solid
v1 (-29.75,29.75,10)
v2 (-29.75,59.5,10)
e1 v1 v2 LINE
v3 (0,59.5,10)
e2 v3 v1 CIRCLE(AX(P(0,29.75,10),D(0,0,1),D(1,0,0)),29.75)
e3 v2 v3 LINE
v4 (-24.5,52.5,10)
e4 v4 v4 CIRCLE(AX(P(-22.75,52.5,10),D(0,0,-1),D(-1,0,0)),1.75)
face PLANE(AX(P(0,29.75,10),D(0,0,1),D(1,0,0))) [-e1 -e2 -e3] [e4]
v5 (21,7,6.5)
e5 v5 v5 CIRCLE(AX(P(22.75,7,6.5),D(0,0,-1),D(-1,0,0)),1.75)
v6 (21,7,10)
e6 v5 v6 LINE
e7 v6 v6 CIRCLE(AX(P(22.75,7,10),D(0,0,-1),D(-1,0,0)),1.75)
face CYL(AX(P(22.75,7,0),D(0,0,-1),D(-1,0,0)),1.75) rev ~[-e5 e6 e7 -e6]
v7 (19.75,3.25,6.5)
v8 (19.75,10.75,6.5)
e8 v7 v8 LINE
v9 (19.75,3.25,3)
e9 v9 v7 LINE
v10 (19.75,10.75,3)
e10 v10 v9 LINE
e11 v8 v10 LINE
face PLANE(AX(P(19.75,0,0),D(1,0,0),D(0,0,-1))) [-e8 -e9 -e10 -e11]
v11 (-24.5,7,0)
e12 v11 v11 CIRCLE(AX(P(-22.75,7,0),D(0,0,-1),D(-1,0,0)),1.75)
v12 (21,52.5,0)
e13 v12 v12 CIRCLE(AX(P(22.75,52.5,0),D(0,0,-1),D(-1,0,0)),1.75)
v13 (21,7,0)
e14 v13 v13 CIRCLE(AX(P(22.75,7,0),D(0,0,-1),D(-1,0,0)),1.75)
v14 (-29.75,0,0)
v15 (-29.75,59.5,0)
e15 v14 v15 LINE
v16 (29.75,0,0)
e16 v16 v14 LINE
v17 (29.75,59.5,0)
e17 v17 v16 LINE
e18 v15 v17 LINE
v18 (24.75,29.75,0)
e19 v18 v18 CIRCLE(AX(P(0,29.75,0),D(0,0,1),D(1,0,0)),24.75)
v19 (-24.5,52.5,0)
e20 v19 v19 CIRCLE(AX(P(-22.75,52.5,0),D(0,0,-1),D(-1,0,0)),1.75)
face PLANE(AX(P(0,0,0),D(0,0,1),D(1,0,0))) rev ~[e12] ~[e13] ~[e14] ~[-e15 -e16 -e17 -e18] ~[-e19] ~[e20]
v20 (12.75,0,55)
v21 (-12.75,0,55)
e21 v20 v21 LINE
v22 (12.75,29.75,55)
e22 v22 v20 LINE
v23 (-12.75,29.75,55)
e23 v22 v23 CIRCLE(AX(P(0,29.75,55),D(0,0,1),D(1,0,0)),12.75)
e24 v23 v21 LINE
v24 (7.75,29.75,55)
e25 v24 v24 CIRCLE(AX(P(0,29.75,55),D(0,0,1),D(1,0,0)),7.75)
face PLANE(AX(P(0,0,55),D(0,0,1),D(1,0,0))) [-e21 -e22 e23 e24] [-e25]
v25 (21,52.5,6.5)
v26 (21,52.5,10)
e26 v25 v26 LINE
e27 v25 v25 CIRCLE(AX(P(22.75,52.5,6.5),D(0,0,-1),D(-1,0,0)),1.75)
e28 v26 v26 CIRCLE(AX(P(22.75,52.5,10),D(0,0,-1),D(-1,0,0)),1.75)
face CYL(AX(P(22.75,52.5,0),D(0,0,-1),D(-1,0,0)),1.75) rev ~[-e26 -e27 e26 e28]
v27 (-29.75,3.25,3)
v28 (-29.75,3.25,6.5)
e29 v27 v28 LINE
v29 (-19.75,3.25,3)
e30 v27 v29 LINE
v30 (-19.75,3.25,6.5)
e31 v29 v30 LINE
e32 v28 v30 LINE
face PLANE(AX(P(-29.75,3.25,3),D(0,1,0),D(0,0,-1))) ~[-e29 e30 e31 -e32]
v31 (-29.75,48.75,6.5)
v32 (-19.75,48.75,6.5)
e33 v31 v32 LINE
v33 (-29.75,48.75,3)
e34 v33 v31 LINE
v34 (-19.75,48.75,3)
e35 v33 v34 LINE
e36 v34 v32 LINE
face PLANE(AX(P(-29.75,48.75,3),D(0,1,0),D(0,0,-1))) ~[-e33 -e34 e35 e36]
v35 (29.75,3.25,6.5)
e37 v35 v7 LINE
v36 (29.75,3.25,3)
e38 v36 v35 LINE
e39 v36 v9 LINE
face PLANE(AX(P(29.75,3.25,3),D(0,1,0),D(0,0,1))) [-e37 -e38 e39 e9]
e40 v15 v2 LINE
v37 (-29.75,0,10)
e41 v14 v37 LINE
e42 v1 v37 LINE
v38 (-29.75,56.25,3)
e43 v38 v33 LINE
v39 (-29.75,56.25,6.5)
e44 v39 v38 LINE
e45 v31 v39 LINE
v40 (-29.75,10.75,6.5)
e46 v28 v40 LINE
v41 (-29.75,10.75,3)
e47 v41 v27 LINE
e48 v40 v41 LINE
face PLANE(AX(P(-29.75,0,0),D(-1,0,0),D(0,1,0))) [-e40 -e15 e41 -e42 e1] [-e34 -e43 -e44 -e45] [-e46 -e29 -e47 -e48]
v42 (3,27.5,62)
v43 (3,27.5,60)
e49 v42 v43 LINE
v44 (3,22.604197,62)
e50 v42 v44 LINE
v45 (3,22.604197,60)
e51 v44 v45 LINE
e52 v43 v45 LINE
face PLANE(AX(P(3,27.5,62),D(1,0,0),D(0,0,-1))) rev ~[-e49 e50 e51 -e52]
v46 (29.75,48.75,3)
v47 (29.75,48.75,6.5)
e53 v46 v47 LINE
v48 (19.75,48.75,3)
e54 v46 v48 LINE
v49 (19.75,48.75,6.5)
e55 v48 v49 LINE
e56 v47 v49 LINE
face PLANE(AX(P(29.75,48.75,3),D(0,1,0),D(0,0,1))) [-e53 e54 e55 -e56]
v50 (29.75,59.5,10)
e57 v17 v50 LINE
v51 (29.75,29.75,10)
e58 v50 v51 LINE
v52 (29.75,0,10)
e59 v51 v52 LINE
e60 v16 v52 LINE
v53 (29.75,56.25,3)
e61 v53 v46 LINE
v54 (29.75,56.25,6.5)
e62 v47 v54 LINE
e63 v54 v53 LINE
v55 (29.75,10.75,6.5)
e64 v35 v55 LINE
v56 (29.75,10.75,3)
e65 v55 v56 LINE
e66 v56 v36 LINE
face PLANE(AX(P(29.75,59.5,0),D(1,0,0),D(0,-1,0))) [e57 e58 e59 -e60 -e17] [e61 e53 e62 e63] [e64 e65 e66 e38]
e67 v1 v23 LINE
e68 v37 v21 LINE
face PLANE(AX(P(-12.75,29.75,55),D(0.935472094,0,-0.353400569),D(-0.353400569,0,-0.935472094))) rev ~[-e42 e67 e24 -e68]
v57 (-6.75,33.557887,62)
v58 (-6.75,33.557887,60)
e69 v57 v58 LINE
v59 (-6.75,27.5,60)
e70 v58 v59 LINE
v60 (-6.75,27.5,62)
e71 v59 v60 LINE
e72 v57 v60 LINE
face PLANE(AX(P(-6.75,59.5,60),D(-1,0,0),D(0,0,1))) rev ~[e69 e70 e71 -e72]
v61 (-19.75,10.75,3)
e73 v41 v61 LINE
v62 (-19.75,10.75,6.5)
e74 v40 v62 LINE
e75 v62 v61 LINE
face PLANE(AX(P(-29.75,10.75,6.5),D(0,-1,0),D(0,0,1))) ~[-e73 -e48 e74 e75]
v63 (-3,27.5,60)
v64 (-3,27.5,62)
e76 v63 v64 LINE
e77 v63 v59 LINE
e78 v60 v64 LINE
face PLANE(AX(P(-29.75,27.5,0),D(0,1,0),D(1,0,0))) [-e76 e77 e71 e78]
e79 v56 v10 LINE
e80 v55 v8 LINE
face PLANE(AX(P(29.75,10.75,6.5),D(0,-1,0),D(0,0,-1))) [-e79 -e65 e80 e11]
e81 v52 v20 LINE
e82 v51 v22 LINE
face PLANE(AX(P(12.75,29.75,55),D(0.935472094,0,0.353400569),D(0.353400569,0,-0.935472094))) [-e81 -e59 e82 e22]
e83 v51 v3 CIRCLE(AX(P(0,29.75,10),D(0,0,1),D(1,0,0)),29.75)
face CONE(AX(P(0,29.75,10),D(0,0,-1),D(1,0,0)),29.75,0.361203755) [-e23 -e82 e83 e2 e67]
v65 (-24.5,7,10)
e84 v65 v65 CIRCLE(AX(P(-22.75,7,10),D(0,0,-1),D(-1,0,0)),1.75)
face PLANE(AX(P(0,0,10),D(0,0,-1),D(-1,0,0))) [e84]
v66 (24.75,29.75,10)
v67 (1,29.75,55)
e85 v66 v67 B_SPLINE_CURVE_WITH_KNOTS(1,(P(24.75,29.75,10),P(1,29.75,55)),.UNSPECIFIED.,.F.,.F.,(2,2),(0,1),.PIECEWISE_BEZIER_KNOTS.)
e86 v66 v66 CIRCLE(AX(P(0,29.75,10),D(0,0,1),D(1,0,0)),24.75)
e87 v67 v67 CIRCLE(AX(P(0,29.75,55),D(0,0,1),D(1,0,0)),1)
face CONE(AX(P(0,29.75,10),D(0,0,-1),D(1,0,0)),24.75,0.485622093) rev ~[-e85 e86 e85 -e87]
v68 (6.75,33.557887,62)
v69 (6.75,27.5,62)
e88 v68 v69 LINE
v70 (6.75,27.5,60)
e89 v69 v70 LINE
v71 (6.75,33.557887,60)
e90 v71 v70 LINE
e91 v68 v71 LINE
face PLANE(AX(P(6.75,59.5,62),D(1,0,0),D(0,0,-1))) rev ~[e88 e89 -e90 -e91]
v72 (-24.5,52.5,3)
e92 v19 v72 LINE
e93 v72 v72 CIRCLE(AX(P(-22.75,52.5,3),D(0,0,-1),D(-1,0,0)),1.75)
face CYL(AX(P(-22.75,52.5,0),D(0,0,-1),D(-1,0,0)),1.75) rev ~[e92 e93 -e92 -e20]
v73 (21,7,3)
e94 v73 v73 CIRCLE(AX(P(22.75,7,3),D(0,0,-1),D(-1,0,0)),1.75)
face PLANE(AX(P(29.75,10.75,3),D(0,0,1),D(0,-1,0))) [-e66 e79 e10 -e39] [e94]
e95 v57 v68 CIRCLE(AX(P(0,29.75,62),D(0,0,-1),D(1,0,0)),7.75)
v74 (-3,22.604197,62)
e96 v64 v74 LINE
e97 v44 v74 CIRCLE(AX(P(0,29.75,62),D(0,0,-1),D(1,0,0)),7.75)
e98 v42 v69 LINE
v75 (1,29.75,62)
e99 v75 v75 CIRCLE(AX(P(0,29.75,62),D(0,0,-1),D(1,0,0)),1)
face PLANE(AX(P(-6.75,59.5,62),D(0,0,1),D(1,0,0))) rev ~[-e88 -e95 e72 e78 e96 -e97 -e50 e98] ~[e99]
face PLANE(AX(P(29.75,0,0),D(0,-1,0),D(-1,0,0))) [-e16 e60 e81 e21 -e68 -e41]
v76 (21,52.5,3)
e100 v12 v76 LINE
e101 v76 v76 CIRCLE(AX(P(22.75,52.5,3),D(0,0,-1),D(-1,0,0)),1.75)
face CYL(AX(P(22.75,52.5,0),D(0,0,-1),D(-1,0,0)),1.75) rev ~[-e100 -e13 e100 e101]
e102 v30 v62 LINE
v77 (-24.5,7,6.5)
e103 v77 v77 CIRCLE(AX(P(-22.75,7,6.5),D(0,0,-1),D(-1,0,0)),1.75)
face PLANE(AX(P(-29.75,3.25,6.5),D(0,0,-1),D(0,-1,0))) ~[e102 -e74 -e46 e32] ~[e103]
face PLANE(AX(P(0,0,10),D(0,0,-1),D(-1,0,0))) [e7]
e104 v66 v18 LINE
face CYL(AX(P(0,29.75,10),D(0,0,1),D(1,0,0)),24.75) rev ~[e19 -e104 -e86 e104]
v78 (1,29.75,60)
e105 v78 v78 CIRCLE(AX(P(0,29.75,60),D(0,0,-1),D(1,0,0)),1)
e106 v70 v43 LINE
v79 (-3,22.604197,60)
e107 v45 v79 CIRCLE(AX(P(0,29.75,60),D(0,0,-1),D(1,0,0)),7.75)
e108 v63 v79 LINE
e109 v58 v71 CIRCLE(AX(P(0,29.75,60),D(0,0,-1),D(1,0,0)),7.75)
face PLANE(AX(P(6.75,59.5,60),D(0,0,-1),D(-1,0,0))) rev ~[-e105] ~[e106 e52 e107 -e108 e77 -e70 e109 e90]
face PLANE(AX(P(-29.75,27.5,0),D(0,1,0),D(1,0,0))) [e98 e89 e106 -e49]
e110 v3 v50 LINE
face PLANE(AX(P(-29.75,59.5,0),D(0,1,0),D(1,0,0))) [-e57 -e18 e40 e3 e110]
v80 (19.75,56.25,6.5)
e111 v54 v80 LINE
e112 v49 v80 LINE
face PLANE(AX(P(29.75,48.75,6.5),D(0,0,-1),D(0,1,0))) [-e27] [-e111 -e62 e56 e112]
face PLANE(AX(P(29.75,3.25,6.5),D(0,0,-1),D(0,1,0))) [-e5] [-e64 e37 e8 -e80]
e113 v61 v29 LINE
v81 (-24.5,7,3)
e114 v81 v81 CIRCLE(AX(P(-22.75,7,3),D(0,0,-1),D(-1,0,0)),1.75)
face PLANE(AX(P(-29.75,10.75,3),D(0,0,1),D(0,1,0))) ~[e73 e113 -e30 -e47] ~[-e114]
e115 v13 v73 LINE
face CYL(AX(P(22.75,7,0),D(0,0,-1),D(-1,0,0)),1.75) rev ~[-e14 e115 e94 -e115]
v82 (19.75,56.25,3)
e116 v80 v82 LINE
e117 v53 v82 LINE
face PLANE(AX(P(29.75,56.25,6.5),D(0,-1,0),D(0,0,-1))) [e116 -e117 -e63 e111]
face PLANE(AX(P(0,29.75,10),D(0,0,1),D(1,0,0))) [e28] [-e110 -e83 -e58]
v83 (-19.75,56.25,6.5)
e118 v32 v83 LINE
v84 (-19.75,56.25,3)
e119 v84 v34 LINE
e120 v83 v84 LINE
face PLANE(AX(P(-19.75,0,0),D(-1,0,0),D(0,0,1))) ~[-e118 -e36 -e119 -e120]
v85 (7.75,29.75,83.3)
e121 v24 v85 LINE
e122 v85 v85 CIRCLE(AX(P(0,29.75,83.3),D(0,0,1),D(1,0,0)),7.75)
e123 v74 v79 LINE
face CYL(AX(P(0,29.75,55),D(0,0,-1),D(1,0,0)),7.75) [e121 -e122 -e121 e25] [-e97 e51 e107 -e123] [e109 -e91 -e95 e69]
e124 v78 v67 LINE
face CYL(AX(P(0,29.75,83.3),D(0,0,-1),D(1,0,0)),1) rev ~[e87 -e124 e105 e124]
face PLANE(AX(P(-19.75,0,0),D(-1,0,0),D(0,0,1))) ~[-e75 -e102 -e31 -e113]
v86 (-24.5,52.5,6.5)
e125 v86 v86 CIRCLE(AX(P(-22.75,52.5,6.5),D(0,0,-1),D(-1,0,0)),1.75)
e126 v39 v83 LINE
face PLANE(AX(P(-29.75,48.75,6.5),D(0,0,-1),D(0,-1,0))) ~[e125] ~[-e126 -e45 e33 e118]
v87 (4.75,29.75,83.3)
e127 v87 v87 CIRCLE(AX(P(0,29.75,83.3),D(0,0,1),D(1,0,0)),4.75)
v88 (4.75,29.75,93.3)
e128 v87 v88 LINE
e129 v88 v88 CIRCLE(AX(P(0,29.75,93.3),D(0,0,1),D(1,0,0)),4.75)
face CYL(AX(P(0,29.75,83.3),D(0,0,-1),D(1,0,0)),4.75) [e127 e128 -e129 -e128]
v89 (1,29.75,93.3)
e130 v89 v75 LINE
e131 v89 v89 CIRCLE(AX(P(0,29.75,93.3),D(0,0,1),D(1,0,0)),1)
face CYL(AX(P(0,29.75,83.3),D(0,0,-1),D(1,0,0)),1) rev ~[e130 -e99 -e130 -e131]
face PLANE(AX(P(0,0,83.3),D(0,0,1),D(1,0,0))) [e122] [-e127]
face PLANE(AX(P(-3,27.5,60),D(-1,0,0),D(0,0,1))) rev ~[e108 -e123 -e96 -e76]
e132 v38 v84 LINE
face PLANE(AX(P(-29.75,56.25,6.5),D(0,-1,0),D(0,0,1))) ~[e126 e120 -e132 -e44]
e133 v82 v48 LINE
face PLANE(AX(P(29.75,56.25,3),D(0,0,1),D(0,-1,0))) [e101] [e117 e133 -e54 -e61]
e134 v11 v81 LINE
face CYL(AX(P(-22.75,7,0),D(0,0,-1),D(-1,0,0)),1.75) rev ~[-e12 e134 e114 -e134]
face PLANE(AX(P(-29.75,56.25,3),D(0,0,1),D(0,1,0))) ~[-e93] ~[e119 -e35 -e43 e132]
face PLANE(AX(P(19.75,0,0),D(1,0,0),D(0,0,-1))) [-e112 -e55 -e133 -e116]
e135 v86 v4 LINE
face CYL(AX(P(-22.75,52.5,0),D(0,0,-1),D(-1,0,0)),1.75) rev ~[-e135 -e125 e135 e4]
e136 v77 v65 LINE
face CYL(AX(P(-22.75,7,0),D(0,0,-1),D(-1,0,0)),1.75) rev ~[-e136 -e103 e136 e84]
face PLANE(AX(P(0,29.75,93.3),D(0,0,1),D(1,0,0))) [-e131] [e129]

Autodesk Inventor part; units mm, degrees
ref_plane "YZ Plane" through (0, 0, 0) normal (1, 0, 0) x (0, 1, 0)
ref_plane "XZ Plane" through (0, 0, 0) normal (0, 1, 0) x (-1, 0, 0)
sketch "Sketch2" plane through (0, 0, 0) normal (0, 0, 1) x (1, 0, 0)
  line L0 (-29.75, 59.5) -> (29.75, 59.5)
  line L1 (29.75, 59.5) -> (29.75, 0)
  line L2 (29.75, 0) -> (-29.75, 0)
  line L3 (-29.75, 0) -> (-29.75, 59.5)
  point P0 (0, 0)
  point P1 (0, 0)
  dimension "d0" = 59.5
extrude "Extrusion1" add sketch "Sketch2" along normal blind 55
sketch "Sketch3" plane through (0, 0, 55) normal (0, 0, 1) x (1, 0, 0)
  circle A0 centre (0, 29.75) radius 1
  circle A1 centre (0, 29.75) radius 7.75
  line L0 (0, 0) -> (0, 59.5) construction
  line L1 (29.75, 59.5) -> (-29.75, 59.5) construction
  line L2 (29.75, 0) -> (29.75, 59.5) construction
  line L3 (29.75, 29.75) -> (-29.75, 29.75) construction
  line L4 (-29.75, 59.5) -> (-29.75, 0) construction
  line L5 (-29.75, 0) -> (29.75, 0) projected
  dimension "d3" = 15.5
  dimension "d5" = 2
  dimension "d47" = 22
extrude "Extrusion2" add sketch "Sketch3" along normal blind 28.3
sketch "Sketch4" plane through (0, 29.75, 83.3) normal (0, 0, 1) x (1, 0, 0)
  circle A0 centre (0, 0) radius 1
  circle A1 centre (0, 0) radius 4.75
  circle A2 centre (0, 0) radius 1 projected
  point P0 (0, -29.75)
  dimension "d8" = 9.5
extrude "Extrusion3" add sketch "Sketch4" along normal blind 10
sketch "Sketch10" plane through (0, 0, 0) normal (0, 0, -1) x (-1, 0, 0)
  circle A0 centre (-22.75, 52.5) radius 1.75
  circle A1 centre (-22.75, 7) radius 1.75
  circle A2 centre (22.75, 52.5) radius 1.75
  circle A3 centre (22.75, 7) radius 1.75
  line L0 (-29.75, 59.5) -> (-29.75, 0) projected
  line L1 (29.75, 59.5) -> (-29.75, 59.5) projected
  line L2 (-29.75, 29.75) -> (29.75, 29.75) construction
  line L3 (29.75, 0) -> (29.75, 59.5) construction
  line L4 (0, 59.5) -> (0, 0) construction
  dimension "d29" = 7
  dimension "d30" = 7
  dimension "d33" = 3.5
extrude "Extrusion5" cut sketch "Sketch10" against normal blind 10
sketch "Sketch9" plane through (29.75, 0, 0) normal (1, 0, 0) x (0, 0, -1)
  line L0 (-6.5, 56.25) -> (-3, 56.25)
  line L1 (-3, 56.25) -> (-3, 48.75)
  line L2 (-3, 48.75) -> (-6.5, 48.75)
  line L3 (-6.5, 48.75) -> (-6.5, 56.25)
  line L4 (-6.5, 10.75) -> (-3, 10.75)
  line L5 (-3, 10.75) -> (-3, 3.25)
  line L6 (-3, 3.25) -> (-6.5, 3.25)
  line L7 (-6.5, 3.25) -> (-6.5, 10.75)
  line L8 (0, 59.5) -> (-55, 59.5) projected
  line L9 (-55, 0) -> (-55, 59.5) construction
  line L10 (-55, 29.75) -> (0, 29.75) construction
  line L11 (0, 0) -> (0, 59.5) construction
  line L12 (0, 54.25) -> (0, 50.75) projected
  line L13 (0, 52.5) -> (-10, 52.5) construction
  line L14 (-10, 54.25) -> (-10, 50.75) projected
  dimension "d24" = 7.5
  dimension "d25" = 3.5
  dimension "d26" = 3
extrude "Extrusion4" cut sketch "Sketch9" against normal blind 10
mirror "Mirror1" about plane through (0, 0, 0) normal (1, 0, 0) of "Extrusion4"
ref_plane "Work Plane1" through (0, 0, 10) normal (0, 0, 1) x (1, 0, 0)
sketch "Sketch11" plane through (0, 0, 10) normal (0, 0, 1) x (1, 0, 0)
  circle A0 centre (0, 29.75) radius 24.75
  circle A1 centre (0, 29.75) radius 1 projected
  line L0 (-29.75, 59.5) -> (29.75, 59.5) projected
  point P0 (0, 0)
  dimension "d49" = 5
extrude "Extrusion6" cut sketch "Sketch11" against normal through all contours A0 | A1
loft "Loft2" cut section 1 edges at (-24.75, 29.75, 10) section 2 edges at (-1, 29.75, 55)
sketch "Sketch7" plane through (-29.75, 59.5, 0) normal (0, 1, 0) x (1, 0, 0)
  line L0 (36.5, -60) -> (23, -60)
  line L1 (23, -60) -> (23, -62)
  line L2 (23, -62) -> (36.5, -62)
  line L3 (36.5, -62) -> (36.5, -60)
  line L4 (29.75, -60) -> (29.75, -62) construction
  line L5 (26.5, -55) -> (28.5, -55) construction
  line L6 (29.75, -55) -> (29.75, -83.3) construction
  line L7 (59.5, -55) -> (0, -55) construction
  line L8 (22, -83.3) -> (37.5, -83.3) projected
  point P0 (29.75, 0)
  dimension "d16" = 2
  dimension "d17" = 13.5
  dimension "d18" = 5
extrude "Extrusion7" cut sketch "Sketch7" against normal blind 32
sketch "Sketch12" plane through (-29.75, 27.5, 0) normal (0, 1, 0) x (1, 0, 0)
  line L0 (32.75, -60) -> (26.75, -60)
  line L1 (26.75, -60) -> (26.75, -62)
  line L2 (26.75, -62) -> (32.75, -62)
  line L3 (32.75, -62) -> (32.75, -60)
  line L4 (36.5, -60) -> (36.5, -62) projected
  line L5 (36.5, -62) -> (23, -62) projected
  line L6 (28.75, -60) -> (30.75, -60) construction
  line L7 (29.75, -60) -> (29.75, -62) construction
  line L8 (30.75, -62) -> (28.75, -62) construction
  point P0 (29.75, 0)
  point P1 (22.3338, -63)
  dimension "d44" = 6
extrude "Extrusion8" cut sketch "Sketch12" against normal through all
sketch "Sketch14" plane through (0, 0, 0) normal (1, 0, 0) x (0, 1, 0)
  line L0 (59.5, 10) -> (42.5, 55)
  line L1 (42.5, 55) -> (79.5, 55)
  line L2 (79.5, 10) -> (79.5, 55)
  line L3 (59.5, 55) -> (0, 55) projected
  line L4 (37.5, 55) -> (37.5, 83.3) projected
  line L5 (59.5, 0) -> (59.5, 55) projected
  line L6 (5, 10) -> (54.5, 10) projected
  line L7 (79.5, 10) -> (59.5, 10)
  line L8 (59.5, 0) -> (59.5, 55) projected
  line L9 (54.25, 10) -> (50.75, 10) projected
  line L10 (29.75, -18.66) -> (29.75, 111.96) projected
  point P0 (0, 0)
  point P1 (55, 37.5)
  point P2 (55, 37.5)
  dimension "d54" = 5
  dimension "d55" = 20
revolve "Revolution1" cut sketch "Sketch14" angle 180 mid plane about axis through (0, 29.75, 55) along (0, 0, 1)
sketch "Sketch15" plane through (12.75, 29.75, 55) normal (0, 1, 0) x (1, 0, 0)
  line L0 (-42.5, 0) -> (-25.5, 0)
  line L1 (-25.5, 0) -> (0, 0)
  line L2 (-42.5, 0) -> (17, 0) projected
  line L3 (0, 0) -> (17, 0)
  line L4 (17, 0) -> (17, 45)
  line L5 (17, 55) -> (17, 0) projected
  line L6 (0, 0) -> (17, 45)
  line L7 (0, 0) -> (17, 45) projected
  line L8 (17, 45) -> (-25.5, 0)
  line L9 (-25.5, 0) -> (-42.5, 45)
  line L10 (-42.5, 45) -> (-25.5, 0) projected
  line L11 (-42.5, 0) -> (-42.5, 45)
  line L12 (-42.5, 55) -> (-42.5, 0) projected
  point P0 (-12.75, 55)
extrude "Extrusion10" cut sketch "Sketch15" against normal through all contours L11 L9 L0 | L6 L4 L2
properties part number "Power_Meter_Adapter_Part1"
